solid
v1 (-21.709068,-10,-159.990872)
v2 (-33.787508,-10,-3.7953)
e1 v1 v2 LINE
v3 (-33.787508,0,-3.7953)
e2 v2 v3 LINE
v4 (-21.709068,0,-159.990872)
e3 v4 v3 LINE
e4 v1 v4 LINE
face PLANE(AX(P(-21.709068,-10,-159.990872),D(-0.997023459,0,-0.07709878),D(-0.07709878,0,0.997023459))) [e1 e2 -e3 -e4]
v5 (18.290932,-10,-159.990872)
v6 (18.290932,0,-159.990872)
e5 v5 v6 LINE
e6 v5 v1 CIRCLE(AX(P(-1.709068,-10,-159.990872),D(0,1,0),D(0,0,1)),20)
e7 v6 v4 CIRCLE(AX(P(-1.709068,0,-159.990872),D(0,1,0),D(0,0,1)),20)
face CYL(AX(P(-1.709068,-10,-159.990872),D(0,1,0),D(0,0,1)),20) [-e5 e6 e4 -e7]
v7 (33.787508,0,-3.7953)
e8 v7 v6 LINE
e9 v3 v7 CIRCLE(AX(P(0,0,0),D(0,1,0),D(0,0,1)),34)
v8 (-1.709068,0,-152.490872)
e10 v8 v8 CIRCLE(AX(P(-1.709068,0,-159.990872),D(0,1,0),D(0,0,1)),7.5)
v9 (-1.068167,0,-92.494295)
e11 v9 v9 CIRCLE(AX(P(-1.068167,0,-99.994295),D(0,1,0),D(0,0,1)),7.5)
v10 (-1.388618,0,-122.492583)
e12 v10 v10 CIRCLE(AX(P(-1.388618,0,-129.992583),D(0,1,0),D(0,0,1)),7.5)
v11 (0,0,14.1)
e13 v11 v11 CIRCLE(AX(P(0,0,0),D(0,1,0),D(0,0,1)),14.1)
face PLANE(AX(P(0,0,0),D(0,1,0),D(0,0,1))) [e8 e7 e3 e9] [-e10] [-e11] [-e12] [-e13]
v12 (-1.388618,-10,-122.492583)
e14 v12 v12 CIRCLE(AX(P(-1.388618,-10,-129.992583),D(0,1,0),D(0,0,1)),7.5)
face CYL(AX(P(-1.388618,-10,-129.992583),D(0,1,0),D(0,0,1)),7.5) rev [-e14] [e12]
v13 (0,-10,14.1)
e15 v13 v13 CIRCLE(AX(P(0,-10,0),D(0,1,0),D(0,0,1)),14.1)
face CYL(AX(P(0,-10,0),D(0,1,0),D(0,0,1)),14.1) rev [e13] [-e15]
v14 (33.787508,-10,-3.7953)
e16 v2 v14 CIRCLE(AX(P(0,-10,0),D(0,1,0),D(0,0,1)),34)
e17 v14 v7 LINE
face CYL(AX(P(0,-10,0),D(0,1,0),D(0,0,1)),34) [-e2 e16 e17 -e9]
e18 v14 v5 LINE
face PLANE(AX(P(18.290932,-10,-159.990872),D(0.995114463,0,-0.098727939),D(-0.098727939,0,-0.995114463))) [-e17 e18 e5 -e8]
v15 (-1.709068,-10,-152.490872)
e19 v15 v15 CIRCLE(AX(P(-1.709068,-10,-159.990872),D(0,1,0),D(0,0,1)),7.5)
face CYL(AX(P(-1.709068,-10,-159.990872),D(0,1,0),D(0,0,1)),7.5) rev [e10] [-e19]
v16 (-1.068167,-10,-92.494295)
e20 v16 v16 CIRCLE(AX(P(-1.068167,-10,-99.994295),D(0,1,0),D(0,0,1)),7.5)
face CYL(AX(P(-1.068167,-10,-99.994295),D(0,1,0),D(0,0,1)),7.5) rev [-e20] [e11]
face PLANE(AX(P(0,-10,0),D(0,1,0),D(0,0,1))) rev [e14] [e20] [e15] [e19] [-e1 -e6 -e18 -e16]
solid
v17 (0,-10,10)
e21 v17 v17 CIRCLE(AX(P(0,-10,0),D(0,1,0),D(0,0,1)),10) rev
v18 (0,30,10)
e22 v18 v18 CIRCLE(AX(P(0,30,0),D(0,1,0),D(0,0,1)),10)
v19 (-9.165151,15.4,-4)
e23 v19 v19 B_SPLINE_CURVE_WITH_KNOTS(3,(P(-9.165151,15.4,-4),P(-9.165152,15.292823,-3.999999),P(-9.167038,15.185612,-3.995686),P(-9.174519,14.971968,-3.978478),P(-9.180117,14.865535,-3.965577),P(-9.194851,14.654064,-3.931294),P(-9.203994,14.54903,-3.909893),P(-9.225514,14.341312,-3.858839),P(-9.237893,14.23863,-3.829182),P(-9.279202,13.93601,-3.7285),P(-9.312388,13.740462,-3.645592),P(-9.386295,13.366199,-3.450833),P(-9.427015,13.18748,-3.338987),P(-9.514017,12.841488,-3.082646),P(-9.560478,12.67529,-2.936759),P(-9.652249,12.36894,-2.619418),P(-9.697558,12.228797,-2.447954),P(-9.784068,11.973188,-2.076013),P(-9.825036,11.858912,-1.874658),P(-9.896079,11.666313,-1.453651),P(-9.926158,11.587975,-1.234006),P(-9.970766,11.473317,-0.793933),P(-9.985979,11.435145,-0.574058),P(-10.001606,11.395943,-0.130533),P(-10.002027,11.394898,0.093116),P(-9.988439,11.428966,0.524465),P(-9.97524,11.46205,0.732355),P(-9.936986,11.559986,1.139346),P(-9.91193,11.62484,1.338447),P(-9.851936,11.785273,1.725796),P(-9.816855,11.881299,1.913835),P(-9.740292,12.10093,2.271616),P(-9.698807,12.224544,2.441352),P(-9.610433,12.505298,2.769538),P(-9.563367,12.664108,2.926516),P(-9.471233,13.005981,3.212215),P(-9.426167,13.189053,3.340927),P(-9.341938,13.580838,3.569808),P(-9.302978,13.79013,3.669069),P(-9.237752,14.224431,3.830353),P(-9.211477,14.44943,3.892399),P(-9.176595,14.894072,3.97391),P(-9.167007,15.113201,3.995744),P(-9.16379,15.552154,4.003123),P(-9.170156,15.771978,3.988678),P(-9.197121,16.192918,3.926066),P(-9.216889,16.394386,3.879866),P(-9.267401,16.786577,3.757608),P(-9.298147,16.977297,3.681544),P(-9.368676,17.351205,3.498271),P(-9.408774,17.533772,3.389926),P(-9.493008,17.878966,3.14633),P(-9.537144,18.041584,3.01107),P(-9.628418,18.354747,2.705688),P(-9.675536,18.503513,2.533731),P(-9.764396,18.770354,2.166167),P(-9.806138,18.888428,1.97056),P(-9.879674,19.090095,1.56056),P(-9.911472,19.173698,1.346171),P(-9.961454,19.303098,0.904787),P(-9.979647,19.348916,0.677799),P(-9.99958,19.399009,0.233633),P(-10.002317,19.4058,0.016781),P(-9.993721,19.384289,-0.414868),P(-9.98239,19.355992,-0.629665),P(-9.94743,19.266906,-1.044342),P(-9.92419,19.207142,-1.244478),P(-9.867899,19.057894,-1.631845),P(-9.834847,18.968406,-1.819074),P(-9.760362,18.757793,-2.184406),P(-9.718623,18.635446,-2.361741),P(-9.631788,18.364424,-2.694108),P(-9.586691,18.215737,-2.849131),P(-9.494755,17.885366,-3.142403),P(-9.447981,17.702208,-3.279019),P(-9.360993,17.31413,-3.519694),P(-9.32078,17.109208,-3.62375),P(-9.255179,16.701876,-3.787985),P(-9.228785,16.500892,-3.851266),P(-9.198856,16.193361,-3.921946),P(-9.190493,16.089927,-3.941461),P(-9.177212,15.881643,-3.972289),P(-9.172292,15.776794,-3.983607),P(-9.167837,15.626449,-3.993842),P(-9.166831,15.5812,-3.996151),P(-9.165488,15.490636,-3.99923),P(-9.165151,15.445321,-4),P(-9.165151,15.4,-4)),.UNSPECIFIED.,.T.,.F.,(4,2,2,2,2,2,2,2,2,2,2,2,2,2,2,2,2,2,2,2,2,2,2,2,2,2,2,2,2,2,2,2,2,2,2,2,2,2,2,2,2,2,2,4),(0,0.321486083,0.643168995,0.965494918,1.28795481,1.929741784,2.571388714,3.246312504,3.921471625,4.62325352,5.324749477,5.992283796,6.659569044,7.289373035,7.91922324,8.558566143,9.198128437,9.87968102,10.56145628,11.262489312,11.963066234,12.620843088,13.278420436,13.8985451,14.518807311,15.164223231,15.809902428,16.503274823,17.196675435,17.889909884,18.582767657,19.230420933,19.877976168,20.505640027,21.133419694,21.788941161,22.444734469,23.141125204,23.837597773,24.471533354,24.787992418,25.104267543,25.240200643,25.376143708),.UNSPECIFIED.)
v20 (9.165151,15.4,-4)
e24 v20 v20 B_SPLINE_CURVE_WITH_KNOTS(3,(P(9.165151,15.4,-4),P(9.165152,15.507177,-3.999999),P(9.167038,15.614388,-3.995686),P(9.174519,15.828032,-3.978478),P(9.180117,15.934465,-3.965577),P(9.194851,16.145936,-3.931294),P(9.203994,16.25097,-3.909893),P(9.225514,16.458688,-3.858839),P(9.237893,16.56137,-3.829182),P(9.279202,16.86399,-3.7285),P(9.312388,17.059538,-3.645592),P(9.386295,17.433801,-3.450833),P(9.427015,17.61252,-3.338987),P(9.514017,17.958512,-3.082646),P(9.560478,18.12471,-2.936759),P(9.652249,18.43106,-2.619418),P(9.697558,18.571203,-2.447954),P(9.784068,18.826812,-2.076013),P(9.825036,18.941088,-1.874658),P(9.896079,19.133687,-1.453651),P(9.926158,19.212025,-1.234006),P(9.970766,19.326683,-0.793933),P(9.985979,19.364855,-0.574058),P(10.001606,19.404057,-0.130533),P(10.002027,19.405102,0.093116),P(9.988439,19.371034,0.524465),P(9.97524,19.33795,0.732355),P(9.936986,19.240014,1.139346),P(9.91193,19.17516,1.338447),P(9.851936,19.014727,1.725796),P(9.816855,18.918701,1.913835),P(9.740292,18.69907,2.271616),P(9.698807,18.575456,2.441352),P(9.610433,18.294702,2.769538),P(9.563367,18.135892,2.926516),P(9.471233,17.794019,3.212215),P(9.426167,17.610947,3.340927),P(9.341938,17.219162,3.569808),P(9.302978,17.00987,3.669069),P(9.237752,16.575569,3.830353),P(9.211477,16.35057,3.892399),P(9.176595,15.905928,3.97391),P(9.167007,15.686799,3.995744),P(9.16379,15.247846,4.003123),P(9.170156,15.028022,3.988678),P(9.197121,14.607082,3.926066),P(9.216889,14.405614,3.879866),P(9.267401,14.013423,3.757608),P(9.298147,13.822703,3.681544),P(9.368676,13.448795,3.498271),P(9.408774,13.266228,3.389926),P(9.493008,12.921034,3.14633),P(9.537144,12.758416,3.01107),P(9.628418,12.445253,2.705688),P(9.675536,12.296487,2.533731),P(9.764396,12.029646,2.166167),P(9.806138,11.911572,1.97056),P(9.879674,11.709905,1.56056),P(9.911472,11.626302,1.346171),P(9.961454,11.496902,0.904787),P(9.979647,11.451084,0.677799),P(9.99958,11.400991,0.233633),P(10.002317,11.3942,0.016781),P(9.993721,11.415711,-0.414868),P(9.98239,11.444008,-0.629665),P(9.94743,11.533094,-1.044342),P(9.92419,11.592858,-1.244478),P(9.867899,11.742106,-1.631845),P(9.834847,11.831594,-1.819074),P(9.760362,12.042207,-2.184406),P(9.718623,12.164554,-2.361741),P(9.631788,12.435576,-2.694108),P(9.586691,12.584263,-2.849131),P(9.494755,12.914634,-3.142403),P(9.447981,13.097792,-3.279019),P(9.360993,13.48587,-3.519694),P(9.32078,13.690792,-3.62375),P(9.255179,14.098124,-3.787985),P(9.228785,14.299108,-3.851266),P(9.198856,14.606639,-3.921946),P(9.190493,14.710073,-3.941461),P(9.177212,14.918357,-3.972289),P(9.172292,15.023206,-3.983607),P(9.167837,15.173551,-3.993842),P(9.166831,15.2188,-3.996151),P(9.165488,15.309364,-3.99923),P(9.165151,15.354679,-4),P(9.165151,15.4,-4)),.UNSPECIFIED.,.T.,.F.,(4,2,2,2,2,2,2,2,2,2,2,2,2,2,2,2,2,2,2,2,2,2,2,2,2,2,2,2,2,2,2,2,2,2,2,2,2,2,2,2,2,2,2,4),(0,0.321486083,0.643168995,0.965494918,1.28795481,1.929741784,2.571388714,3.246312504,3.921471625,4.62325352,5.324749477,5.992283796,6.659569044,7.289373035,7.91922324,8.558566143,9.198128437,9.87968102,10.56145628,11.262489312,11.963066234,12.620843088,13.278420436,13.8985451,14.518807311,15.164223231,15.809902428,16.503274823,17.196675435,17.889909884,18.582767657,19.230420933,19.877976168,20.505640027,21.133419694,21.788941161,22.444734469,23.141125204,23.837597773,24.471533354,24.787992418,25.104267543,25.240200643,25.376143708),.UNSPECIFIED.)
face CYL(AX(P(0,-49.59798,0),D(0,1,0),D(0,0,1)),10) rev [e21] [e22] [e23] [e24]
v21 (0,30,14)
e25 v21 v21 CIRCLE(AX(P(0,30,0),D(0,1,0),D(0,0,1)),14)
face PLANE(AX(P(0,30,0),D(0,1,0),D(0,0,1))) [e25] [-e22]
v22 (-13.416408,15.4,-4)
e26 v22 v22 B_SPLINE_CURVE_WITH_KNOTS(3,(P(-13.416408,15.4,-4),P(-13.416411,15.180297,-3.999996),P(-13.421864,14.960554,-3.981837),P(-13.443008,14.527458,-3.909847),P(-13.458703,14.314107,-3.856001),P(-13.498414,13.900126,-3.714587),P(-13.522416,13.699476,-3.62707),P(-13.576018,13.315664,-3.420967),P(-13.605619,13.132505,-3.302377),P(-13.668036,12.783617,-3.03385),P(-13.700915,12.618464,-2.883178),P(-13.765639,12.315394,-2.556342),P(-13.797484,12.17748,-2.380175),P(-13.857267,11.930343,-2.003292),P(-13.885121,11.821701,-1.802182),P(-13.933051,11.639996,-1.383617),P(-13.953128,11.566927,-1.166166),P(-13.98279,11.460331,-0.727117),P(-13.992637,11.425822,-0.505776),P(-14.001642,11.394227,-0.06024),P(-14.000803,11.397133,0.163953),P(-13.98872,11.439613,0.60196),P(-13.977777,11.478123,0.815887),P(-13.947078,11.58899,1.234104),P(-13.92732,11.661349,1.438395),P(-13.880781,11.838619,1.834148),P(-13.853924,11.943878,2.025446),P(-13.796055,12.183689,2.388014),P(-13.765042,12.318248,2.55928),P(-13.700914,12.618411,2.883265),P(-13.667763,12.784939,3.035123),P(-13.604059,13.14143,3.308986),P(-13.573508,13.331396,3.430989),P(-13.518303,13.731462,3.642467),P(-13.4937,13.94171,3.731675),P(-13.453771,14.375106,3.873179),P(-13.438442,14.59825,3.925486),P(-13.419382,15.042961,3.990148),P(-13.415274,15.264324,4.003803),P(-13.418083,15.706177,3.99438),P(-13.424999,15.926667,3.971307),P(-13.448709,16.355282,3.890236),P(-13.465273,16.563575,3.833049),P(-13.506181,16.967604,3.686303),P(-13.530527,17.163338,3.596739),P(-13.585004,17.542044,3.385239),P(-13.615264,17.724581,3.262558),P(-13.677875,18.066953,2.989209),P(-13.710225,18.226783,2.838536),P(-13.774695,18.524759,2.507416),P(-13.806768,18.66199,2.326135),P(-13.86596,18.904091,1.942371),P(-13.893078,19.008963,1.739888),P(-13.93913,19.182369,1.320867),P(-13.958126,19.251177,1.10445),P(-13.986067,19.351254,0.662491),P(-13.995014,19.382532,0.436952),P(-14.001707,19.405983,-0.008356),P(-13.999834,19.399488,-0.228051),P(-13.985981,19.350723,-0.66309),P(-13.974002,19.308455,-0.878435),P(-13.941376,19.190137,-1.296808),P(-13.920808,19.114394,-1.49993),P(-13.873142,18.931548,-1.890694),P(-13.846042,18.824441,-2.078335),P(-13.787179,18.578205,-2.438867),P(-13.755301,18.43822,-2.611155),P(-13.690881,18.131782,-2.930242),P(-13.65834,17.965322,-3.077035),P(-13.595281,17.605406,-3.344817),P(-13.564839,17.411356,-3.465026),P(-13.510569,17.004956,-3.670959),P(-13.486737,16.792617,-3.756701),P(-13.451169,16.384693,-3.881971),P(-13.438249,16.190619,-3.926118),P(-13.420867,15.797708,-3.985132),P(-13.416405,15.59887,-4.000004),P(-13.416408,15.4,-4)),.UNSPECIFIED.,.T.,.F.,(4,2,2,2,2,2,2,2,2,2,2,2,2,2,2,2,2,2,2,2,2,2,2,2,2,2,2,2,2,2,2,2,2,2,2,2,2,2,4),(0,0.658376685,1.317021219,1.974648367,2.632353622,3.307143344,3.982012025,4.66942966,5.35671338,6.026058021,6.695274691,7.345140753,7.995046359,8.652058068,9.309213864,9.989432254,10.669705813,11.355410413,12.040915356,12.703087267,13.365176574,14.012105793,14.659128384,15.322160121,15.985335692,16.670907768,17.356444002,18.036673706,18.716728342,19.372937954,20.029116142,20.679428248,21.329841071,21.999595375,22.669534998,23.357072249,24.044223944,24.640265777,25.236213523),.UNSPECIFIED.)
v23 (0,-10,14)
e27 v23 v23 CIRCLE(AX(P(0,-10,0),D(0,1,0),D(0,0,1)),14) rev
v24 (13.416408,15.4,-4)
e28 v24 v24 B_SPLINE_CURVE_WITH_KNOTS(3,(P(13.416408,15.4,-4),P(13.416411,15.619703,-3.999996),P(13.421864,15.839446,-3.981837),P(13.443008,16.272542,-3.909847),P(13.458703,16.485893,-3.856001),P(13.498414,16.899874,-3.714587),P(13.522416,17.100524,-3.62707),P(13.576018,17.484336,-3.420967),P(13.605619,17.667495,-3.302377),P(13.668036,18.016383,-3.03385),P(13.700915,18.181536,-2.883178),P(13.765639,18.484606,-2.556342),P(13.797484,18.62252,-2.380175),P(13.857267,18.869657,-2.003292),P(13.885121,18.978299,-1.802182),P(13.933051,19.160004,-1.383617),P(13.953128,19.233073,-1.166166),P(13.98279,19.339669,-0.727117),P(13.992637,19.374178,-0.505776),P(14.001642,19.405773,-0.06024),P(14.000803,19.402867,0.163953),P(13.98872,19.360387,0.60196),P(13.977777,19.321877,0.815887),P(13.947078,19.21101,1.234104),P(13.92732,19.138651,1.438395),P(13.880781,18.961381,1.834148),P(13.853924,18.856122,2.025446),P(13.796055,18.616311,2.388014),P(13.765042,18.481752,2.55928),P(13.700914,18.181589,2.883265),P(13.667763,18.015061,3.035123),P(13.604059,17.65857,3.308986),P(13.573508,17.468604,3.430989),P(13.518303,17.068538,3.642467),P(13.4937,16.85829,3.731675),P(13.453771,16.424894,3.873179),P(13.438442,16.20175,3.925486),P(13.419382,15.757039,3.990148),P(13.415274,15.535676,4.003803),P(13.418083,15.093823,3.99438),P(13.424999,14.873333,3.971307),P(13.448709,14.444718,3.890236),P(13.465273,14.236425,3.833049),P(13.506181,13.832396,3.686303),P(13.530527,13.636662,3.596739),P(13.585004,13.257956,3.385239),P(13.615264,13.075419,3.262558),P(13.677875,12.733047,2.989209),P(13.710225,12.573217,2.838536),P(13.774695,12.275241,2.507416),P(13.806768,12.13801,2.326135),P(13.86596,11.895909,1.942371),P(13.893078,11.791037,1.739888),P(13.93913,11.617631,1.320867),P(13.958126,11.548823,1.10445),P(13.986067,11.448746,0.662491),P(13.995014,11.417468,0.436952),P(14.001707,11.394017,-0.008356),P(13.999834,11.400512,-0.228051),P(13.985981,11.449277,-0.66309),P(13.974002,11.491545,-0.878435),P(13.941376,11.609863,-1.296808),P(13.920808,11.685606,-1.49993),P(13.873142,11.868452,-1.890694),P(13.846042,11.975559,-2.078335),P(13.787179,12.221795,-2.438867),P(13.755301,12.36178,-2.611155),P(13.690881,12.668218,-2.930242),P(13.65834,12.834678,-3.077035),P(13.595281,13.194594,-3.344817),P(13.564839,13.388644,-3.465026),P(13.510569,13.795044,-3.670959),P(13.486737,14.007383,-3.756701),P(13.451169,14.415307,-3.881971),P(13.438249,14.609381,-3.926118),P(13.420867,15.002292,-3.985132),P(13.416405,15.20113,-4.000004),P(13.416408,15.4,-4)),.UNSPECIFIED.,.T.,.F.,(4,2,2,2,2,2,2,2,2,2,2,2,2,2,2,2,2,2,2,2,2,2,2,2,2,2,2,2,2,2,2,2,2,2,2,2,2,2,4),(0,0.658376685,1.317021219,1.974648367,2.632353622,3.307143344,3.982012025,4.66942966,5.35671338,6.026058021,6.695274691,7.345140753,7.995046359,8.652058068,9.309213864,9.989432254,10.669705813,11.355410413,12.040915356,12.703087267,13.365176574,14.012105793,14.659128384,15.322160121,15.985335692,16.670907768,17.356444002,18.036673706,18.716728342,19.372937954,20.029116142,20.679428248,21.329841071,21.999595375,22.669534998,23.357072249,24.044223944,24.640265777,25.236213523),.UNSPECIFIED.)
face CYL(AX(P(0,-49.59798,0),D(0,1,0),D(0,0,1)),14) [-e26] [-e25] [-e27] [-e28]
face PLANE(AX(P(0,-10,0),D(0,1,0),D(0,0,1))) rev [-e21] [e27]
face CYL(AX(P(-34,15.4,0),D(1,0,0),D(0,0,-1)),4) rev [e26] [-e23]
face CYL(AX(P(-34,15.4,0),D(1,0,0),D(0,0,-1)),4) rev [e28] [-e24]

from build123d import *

# Parameters (mm, degrees)
SKETCH1_R                = 14.1
SKETCH1_R_2              = 7.5
BASE_FLANGE1_DEPTH       = 10
BOSS_EXTRUDE1_DEPTH      = 30
BOSS_EXTRUDE1_DEPTH_BACK = 10
SKETCH6_R                = 14
SKETCH6_R_2              = 10
CUT_EXTRUDE1_DEPTH       = 186.614422829
CUT_EXTRUDE1_DEPTH_BACK  = 186.614422829
SKETCH8_R                = 4


# Sheet-metal steps are written as plain solids
with BuildPart() as part:
    # Sketch1 → Base-Flange1 (new body)
    with BuildSketch(Plane(origin=(0, 0, 0), x_dir=(1, 0, 0), z_dir=(0, 1, 0))):
        with BuildLine():
            Line((-21.709067953, 159.990871886), (-33.787508059, 3.795299618))
            ThreePointArc((-33.787508059, 3.795299618), (0, -34), (33.787508059, 3.795299618))
            Line((33.787508059, 3.795299618), (18.290932047, 159.990871886))
            ThreePointArc((18.290932047, 159.990871886), (-1.709067953, 179.990871886), (-21.709067953, 159.990871886))
        make_face()
        with Locations(Location((0, 0, 0), (0, 0, 270))):
            Circle(SKETCH1_R, mode=Mode.SUBTRACT)
        with Locations(Location((-1.709067953, 159.990871886, 0), (0, 0, 270))):
            Circle(SKETCH1_R_2, mode=Mode.SUBTRACT)
        with Locations(Location((-1.388617712, 129.992583407, 0), (0, 0, 270))):
            Circle(SKETCH1_R_2, mode=Mode.SUBTRACT)
        with Locations(Location((-1.068167471, 99.994294929, 0), (0, 0, 270))):
            Circle(SKETCH1_R_2, mode=Mode.SUBTRACT)
    extrude(amount=-BASE_FLANGE1_DEPTH)


with BuildPart() as body_2:
    # Sketch6 → Boss-Extrude1 (new, two sides: drawn at the far end of the back side and taken through both)
    with BuildSketch(Plane(origin=(0, 0, 0), x_dir=(1, 0, 0), z_dir=(0, 1, 0)).offset(-BOSS_EXTRUDE1_DEPTH_BACK)):
        with Locations(Location((0, 0, 0), (0, 0, 270))):
            Circle(SKETCH6_R)
        with Locations(Location((0, 0, 0), (0, 0, 270))):
            Circle(SKETCH6_R_2, mode=Mode.SUBTRACT)
    extrude(amount=BOSS_EXTRUDE1_DEPTH + BOSS_EXTRUDE1_DEPTH_BACK)

    # Sketch8 → Cut-Extrude1 (cut, two sides: drawn at the far end of the back side and taken through both)
    with BuildSketch(Plane(origin=(0, 0, 0), x_dir=(0, 0, -1), z_dir=(1, 0, 0)).offset(-CUT_EXTRUDE1_DEPTH_BACK)):
        with Locations((0, 15.4)):
            Circle(SKETCH8_R)
    extrude(amount=CUT_EXTRUDE1_DEPTH + CUT_EXTRUDE1_DEPTH_BACK, mode=Mode.SUBTRACT)


solid = Compound([part.part, body_2.part])
